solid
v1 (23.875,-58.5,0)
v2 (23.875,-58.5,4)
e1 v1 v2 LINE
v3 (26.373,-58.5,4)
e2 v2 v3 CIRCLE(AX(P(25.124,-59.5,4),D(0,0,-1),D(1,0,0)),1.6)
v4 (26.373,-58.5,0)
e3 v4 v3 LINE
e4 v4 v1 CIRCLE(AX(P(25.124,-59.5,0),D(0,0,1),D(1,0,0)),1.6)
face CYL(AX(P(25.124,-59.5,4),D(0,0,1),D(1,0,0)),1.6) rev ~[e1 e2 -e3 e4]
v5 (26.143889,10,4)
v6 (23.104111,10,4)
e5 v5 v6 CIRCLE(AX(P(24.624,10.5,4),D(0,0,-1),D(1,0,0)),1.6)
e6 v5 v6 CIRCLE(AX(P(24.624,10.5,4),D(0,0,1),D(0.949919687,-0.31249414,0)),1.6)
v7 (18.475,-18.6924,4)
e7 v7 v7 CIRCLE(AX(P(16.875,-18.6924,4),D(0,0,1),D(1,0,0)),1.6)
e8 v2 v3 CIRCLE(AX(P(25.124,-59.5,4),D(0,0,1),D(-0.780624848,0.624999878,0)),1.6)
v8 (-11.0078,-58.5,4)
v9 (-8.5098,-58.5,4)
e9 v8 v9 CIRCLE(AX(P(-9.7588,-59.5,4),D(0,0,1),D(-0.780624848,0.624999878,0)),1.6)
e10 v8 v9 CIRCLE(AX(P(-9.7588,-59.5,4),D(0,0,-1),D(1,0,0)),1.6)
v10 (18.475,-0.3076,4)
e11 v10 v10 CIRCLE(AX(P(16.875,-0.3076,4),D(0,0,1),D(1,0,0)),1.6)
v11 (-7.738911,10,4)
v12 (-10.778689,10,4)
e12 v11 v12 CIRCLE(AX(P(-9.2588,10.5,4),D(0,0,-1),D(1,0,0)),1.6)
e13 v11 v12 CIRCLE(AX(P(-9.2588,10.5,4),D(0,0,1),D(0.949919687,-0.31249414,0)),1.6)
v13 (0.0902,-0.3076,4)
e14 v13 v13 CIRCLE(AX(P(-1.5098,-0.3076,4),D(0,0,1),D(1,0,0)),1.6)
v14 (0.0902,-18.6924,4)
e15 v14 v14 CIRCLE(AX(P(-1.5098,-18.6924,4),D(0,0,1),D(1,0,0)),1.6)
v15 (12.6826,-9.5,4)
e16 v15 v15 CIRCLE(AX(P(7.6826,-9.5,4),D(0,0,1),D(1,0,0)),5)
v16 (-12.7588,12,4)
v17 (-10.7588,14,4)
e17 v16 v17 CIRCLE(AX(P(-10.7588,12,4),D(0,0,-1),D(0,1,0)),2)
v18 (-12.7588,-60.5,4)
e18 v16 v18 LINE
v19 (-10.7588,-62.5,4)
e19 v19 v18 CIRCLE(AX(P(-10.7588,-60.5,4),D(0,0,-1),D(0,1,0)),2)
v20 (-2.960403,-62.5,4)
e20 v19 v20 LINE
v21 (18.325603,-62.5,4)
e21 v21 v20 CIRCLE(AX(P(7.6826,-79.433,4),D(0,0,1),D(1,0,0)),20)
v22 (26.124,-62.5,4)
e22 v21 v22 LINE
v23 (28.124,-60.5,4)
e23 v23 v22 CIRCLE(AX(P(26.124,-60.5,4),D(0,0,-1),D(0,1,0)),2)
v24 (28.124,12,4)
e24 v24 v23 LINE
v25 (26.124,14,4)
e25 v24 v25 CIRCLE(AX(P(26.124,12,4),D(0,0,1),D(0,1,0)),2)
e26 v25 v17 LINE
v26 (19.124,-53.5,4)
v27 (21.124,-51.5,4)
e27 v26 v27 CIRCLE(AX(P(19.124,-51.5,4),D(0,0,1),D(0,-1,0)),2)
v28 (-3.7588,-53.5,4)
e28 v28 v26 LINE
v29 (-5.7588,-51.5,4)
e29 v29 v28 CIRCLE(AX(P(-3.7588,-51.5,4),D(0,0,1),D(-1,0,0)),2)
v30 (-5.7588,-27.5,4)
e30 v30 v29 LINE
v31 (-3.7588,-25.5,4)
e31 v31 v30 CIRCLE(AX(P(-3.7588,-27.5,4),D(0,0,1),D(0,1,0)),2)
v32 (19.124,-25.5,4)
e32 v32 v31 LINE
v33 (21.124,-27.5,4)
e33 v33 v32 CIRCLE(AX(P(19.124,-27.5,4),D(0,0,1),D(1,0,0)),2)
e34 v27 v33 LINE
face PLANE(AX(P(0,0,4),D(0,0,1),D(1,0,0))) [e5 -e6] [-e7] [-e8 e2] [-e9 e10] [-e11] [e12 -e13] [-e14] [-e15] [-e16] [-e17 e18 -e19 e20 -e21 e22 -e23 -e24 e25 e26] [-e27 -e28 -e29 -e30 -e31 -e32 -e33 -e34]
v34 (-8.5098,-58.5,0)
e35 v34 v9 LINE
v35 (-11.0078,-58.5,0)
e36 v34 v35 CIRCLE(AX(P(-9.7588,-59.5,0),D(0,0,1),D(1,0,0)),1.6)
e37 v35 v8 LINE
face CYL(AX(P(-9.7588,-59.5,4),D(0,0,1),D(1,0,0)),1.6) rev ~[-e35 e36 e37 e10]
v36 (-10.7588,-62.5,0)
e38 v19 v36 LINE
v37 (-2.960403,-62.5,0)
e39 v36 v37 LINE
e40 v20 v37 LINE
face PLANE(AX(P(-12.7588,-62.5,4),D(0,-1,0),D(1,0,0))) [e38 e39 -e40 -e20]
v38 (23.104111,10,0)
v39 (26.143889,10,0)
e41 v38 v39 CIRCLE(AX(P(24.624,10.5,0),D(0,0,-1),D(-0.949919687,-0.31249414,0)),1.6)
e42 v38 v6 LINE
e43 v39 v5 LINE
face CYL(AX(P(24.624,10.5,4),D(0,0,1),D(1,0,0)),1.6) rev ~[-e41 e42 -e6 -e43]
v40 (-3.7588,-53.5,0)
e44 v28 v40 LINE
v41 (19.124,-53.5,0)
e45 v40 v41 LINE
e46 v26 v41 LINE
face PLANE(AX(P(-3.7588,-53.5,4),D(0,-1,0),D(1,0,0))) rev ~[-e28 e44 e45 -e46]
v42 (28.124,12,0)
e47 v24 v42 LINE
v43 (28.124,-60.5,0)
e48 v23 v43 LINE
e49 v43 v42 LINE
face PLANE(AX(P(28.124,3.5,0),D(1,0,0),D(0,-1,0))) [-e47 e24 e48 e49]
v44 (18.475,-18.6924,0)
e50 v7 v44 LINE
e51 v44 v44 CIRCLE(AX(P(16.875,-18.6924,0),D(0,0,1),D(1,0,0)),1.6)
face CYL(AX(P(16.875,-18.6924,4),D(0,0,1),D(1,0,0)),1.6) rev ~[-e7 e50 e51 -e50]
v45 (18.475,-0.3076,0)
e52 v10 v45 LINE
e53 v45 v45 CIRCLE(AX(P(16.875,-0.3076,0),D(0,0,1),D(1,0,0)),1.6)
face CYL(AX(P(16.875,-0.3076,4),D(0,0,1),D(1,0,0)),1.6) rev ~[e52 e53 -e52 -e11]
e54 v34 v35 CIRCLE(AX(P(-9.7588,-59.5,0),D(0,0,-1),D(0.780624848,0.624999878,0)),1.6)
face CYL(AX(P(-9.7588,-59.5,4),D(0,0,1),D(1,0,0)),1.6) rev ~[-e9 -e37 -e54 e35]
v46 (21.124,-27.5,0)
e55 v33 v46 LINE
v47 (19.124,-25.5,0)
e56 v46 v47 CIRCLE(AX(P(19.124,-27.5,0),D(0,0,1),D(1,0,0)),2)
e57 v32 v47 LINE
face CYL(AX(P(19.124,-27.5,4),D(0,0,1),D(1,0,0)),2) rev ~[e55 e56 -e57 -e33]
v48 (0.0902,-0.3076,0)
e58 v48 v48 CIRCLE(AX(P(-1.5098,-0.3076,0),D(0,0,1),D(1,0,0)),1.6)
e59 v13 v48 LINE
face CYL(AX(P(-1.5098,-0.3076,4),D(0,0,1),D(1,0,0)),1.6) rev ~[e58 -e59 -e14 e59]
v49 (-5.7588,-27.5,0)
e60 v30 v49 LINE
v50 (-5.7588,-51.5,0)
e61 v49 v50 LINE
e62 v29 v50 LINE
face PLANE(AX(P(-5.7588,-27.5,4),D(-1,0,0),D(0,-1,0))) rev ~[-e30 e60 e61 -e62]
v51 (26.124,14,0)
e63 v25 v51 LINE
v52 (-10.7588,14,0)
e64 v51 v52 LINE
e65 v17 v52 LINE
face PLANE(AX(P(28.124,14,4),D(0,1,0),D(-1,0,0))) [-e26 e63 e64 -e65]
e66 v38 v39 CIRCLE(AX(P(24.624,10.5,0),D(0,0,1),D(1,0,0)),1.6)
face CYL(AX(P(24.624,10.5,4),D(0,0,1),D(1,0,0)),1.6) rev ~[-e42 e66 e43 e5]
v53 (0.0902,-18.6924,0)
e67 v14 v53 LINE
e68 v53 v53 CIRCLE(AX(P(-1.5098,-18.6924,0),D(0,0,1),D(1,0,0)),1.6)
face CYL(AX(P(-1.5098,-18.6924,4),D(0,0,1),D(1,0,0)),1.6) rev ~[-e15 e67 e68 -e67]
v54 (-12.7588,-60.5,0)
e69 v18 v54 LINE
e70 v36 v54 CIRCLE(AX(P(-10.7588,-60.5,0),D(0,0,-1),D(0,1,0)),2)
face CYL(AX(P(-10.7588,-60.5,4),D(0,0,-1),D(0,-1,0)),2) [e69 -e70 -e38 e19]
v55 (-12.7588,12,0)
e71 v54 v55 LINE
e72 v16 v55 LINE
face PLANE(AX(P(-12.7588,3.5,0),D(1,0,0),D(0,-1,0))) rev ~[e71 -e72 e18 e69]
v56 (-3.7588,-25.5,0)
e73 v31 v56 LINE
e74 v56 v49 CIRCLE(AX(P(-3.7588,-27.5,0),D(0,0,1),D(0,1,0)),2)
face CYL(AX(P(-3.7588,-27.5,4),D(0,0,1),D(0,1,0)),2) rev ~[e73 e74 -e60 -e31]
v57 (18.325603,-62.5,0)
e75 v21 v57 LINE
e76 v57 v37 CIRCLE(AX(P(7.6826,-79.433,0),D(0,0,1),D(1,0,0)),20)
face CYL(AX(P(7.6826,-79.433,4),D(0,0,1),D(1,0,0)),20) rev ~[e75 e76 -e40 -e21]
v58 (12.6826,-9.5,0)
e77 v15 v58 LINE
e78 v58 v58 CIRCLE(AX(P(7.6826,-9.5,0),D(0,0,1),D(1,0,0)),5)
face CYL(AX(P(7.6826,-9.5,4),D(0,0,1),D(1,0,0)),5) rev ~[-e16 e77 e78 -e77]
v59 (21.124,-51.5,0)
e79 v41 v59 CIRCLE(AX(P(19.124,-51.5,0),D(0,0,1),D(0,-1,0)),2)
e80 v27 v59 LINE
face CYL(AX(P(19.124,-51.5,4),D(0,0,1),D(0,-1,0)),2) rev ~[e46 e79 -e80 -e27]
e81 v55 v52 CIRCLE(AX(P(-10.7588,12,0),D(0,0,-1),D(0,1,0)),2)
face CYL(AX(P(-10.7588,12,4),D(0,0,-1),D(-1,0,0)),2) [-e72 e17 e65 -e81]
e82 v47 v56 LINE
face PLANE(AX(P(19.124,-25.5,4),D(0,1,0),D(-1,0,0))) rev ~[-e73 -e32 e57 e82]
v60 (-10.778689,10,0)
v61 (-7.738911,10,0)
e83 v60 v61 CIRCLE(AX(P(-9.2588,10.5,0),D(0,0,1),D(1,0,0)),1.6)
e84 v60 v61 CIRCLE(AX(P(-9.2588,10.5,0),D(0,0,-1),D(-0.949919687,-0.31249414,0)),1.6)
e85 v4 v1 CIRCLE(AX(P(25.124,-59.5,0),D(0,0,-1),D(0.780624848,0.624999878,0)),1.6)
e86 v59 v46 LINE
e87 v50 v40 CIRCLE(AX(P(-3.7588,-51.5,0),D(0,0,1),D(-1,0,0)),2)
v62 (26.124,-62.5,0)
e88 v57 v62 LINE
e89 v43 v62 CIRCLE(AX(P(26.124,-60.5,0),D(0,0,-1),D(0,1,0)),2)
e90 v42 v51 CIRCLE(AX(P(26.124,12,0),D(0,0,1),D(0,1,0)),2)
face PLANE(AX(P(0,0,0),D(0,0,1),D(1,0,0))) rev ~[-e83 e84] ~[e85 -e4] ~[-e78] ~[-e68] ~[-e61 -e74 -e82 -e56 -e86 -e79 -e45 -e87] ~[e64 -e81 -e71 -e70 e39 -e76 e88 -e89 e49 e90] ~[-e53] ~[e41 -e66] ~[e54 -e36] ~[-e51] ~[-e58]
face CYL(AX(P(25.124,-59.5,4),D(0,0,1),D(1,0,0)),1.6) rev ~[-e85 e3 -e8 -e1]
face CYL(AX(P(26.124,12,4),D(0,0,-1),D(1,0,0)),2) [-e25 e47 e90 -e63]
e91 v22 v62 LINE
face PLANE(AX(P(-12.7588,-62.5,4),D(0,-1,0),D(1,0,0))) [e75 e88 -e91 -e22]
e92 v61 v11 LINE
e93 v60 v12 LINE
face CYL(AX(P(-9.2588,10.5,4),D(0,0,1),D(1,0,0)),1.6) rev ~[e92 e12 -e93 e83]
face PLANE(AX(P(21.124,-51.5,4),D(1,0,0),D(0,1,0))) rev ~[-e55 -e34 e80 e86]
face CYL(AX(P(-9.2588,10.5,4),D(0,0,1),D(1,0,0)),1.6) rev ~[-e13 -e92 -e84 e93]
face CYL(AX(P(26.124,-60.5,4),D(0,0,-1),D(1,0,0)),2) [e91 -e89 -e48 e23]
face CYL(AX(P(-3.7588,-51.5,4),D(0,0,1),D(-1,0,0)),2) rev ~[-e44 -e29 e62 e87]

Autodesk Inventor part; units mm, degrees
ref_plane "YZ Plane" through (0, 0, 0) normal (1, 0, 0) x (0, 1, 0)
ref_plane "XZ Plane" through (0, 0, 0) normal (0, 1, 0) x (-1, 0, 0)
ref_plane "XY Plane" through (0, 0, 0) normal (0, 0, 1) x (1, 0, 0)
sketch "스케치1" plane through (0, 0, 0) normal (0, 0, 1) x (1, 0, 0)
  line L0 (28.124, 3.5) -> (28.124, -58.5)
  line L1 (-12.7588, 3.5) -> (-12.7588, -58.5)
  line L2 (-12.7588, -58.5) -> (28.124, -58.5)
  line L3 (-12.7588, 3.5) -> (-12.7588, 4.4)
  line L4 (28.124, 4.4) -> (28.124, 3.5)
  line L5 (-12.7588, 4.4) -> (-12.7588, 10)
  line L6 (-12.7588, 10) -> (28.124, 10)
  line L7 (28.124, 10) -> (28.124, 4.4)
  dimension "d16" = 68.5
  dimension "d50" = 40.8828
extrude "돌출2" add sketch "스케치1" along normal blind 4
sketch "스케치4" plane through (0, 0, 4) normal (0, 0, 1) x (1, 0, 0)
  circle A0 centre (7.6826, -9.5) radius 5
  point P0 (0, 0)
sketch "스케치6" plane through (0, 0, 4) normal (0, 0, 1) x (1, 0, 0)
  circle A0 centre (7.6826, -9.5) radius 13 construction
  line L0 (7.6826, -9.5) -> (-1.5098, -0.3076) construction
  line L1 (7.6826, -9.5) -> (20.6826, -9.5) construction
  line L2 (7.6826, -9.5) -> (-1.5098, -18.6924) construction
  line L3 (7.6826, -9.5) -> (20.6826, -9.5) construction
  circle A1 centre (-1.5098, -0.3076) radius 1.6
  circle A2 centre (-1.5098, -18.6924) radius 1.6
  circle A3 centre (7.6826, -9.5) radius 5 projected
  circle A4 centre (16.875, -0.3076) radius 1.6
  line L4 (7.6826, -9.5) -> (16.875, -18.6924) construction
  circle A5 centre (16.875, -18.6924) radius 1.6
  point P0 (0, 0)
  dimension "d51" = 26
  dimension "d52" = 135
  dimension "d53" = 135
  dimension "d54" = 3.2
  dimension "d55" = 3.2
  dimension "d56" = 3.2
  dimension "d57" = 3.2
extrude "돌출4" cut sketch "스케치6" against normal up to surface (4 mm away)
sketch "스케치5" plane through (0, 0, 4) normal (0, 0, 1) x (1, 0, 0)
  line L0 (-12.7588, 10) -> (-12.7588, -58.5) projected
  line L1 (-12.7588, -58.5) -> (28.124, -58.5) projected
  line L2 (28.124, -58.5) -> (28.124, 10) projected
  line L3 (28.124, 10) -> (-12.7588, 10) projected
  circle A0 centre (-9.7588, -59.5) radius 1.6
  circle A1 centre (25.124, -59.5) radius 1.6
  circle A2 centre (-9.2588, 10.5) radius 1.6
  circle A3 centre (24.624, 10.5) radius 1.6
  line L4 (28.124, 10) -> (28.124, 14)
  line L5 (28.124, -58.5) -> (28.124, 10) projected
  line L6 (28.124, -58.5) -> (28.124, -62.5)
  point P0 (0, 0)
  dimension "d36" = 3.2
  dimension "d37" = 3.2
  dimension "d38" = 3.2
  dimension "d39" = 3.2
  dimension "d40" = 3
  dimension "d42" = 3.5
  dimension "d44" = 3.5
  dimension "d46" = 3
  dimension "d64" = 4
  dimension "d65" = 3.5
  dimension "d66" = 3.5
  dimension "d67" = 4
  dimension "d68" = 3
  dimension "d69" = 3
extrude "돌출3" cut sketch "스케치5" against normal up to surface (4 mm away) contours A2 L3 | L3 A2 | A0 L1 | L1 A0 | A3 L3 | L3 A3 | A1 L1 | L1 A1
sketch "스케치7" plane through (0, 0, 4) normal (0, 0, 1) x (1, 0, 0)
  line L0 (-12.7588, 10) -> (-12.7588, 14)
  arc A0 (23.1041, 10) -> (26.1439, 10) centre (24.624, 10.5) ccw projected
  arc A1 (26.373, -58.5) -> (23.875, -58.5) centre (25.124, -59.5) ccw projected
  arc A2 (-10.7787, 10) -> (-7.7389, 10) centre (-9.2588, 10.5) ccw projected
  arc A3 (-8.5098, -58.5) -> (-11.0078, -58.5) centre (-9.7588, -59.5) ccw projected
  circle A4 centre (16.875, -0.3076) radius 1.6 projected
  circle A5 centre (-1.5098, -18.6924) radius 1.6 projected
  circle A6 centre (7.6826, -9.5) radius 5 projected
  circle A7 centre (16.875, -18.6924) radius 1.6 projected
  circle A8 centre (-1.5098, -0.3076) radius 1.6 projected
  line L1 (-12.7588, -58.5) -> (-11.0078, -58.5) projected
  line L2 (28.124, -58.5) -> (28.124, 10) projected
  line L3 (28.124, 10) -> (26.1439, 10) projected
  line L4 (-12.7588, 10) -> (-12.7588, -58.5) projected
  line L5 (28.124, 10) -> (28.124, 14)
  line L6 (28.124, 14) -> (-12.7588, 14)
  line L7 (28.124, -58.5) -> (28.124, 10) projected
  line L8 (-12.7588, -58.5) -> (28.124, -58.5) projected
  line L9 (28.124, -58.5) -> (-12.7588, -58.5)
  line L10 (-12.7588, -58.5) -> (-12.7588, -62.5)
  line L11 (-12.7588, -62.5) -> (28.124, -62.5)
  line L12 (28.124, -62.5) -> (28.124, -58.5)
  line L13 (23.1041, 10) -> (-7.7389, 10) projected
  line L14 (-10.7787, 10) -> (-12.7588, 10) projected
  line L15 (-8.5098, -58.5) -> (23.875, -58.5) projected
  line L16 (26.373, -58.5) -> (28.124, -58.5) projected
  circle A9 centre (24.624, 10.5) radius 1.6
  arc A10 (-10.7787, 10) -> (-7.7389, 10) centre (-9.2588, 10.5) ccw projected
  circle A11 centre (-9.2588, 10.5) radius 1.6
  circle A12 centre (25.124, -59.5) radius 1.6
  arc A13 (-8.5098, -58.5) -> (-11.0078, -58.5) centre (-9.7588, -59.5) ccw projected
  circle A14 centre (-9.7588, -59.5) radius 1.6
  point P0 (0, 0)
  point P1 (26.373, -58.5)
  point P2 (23.875, -58.5)
  point P3 (-7.7389, 10)
  dimension "d60" = 4
  dimension "d61" = 4
extrude "돌출6" add sketch "스케치7" against normal up to surface (4 mm away) contours L0 L6 L5 L3 A9 L13 A11 L14 | L1 A14 L8 A12 L12 L11 L10
fillet "모깎기3" radius 2 4 edges at (28.124, 14, 2) (-12.7588, 14, 2) (-12.7588, -62.5, 2) (28.124, -62.5, 2)
sketch "스케치10" plane through (0, 0, 4) normal (0, 0, 1) x (1, 0, 0)
  line L0 (-3.7588, -53.5) -> (19.124, -53.5)
  line L1 (21.124, -51.5) -> (21.124, -27.5)
  line L2 (19.124, -25.5) -> (-3.7588, -25.5)
  line L3 (-5.7588, -27.5) -> (-5.7588, -51.5)
  circle A0 centre (-9.7588, -59.5) radius 1.6 projected
  line L4 (28.124, -60.5) -> (28.124, 12) projected
  line L5 (-12.7588, 12) -> (-12.7588, -60.5) projected
  circle A1 centre (25.124, -59.5) radius 1.6 projected
  circle A2 centre (24.624, 10.5) radius 1.6 projected
  circle A3 centre (-9.2588, 10.5) radius 1.6 projected
  circle A4 centre (16.875, -0.3076) radius 1.6 projected
  circle A5 centre (-1.5098, -18.6924) radius 1.6 projected
  circle A6 centre (7.6826, -9.5) radius 5 projected
  circle A7 centre (16.875, -18.6924) radius 1.6 projected
  circle A8 centre (-1.5098, -0.3076) radius 1.6 projected
  arc A9 (-5.7588, -51.5) -> (-3.7588, -53.5) centre (-3.7588, -51.5) ccw
  arc A10 (19.124, -53.5) -> (21.124, -51.5) centre (19.124, -51.5) ccw
  arc A11 (21.124, -27.5) -> (19.124, -25.5) centre (19.124, -27.5) ccw
  arc A12 (-3.7588, -25.5) -> (-5.7588, -27.5) centre (-3.7588, -27.5) ccw
  arc A13 (26.124, -62.5) -> (28.124, -60.5) centre (26.124, -60.5) ccw projected
  arc A14 (28.124, 12) -> (26.124, 14) centre (26.124, 12) ccw projected
  line L6 (26.124, 14) -> (-10.7588, 14) projected
  arc A15 (-10.7588, 14) -> (-12.7588, 12) centre (-10.7588, 12) ccw projected
  arc A16 (-12.7588, -60.5) -> (-10.7588, -62.5) centre (-10.7588, -60.5) ccw projected
  line L7 (-10.7588, -62.5) -> (26.124, -62.5) projected
  point P0 (0, 0)
  point P1 (-5.7588, -53.5)
  point P2 (21.124, -25.5)
  point P3 (21.124, -53.5)
  point P4 (-5.7588, -25.5)
  dimension "d84" = 16
  dimension "d87" = 7
  dimension "d88" = 7
  dimension "d89" = 2
extrude "돌출7" cut sketch "스케치10" against normal up to surface (4 mm away) contours A9 L3 A12 L2 A11 L1 A10 L0
sketch "스케치11" plane through (0, 0, 4) normal (0, 0, 1) x (1, 0, 0)
  line L0 (-10.7588, 14) -> (26.124, 14) projected
  line L1 (7.6826, 14) -> (7.6826, -136) construction
  circle A0 centre (7.6826, -79.433) radius 20
  arc A1 (21.124, -27.5) -> (19.124, -25.5) centre (19.124, -27.5) ccw projected
  line L2 (21.124, -27.5) -> (21.124, -51.5) projected
  arc A2 (19.124, -53.5) -> (21.124, -51.5) centre (19.124, -51.5) ccw projected
  line L3 (19.124, -53.5) -> (-3.7588, -53.5) projected
  arc A3 (-5.7588, -51.5) -> (-3.7588, -53.5) centre (-3.7588, -51.5) ccw projected
  line L4 (-5.7588, -51.5) -> (-5.7588, -27.5) projected
  arc A4 (-3.7588, -25.5) -> (-5.7588, -27.5) centre (-3.7588, -27.5) ccw projected
  line L5 (-3.7588, -25.5) -> (19.124, -25.5) projected
  circle A5 centre (25.124, -59.5) radius 1.6 projected
  circle A6 centre (-9.7588, -59.5) radius 1.6 projected
  line L6 (28.124, -60.5) -> (28.124, 12) projected
  line L7 (-12.7588, 12) -> (-12.7588, -60.5) projected
  circle A7 centre (24.624, 10.5) radius 1.6 projected
  circle A8 centre (-9.2588, 10.5) radius 1.6 projected
  circle A9 centre (16.875, -0.3076) radius 1.6 projected
  circle A10 centre (-1.5098, -18.6924) radius 1.6 projected
  circle A11 centre (7.6826, -9.5) radius 5 projected
  circle A12 centre (16.875, -18.6924) radius 1.6 projected
  circle A13 centre (-1.5098, -0.3076) radius 1.6 projected
  arc A14 (26.124, -62.5) -> (28.124, -60.5) centre (26.124, -60.5) ccw projected
  arc A15 (28.124, 12) -> (26.124, 14) centre (26.124, 12) ccw projected
  line L8 (26.124, 14) -> (-10.7588, 14) projected
  arc A16 (-10.7588, 14) -> (-12.7588, 12) centre (-10.7588, 12) ccw projected
  arc A17 (-12.7588, -60.5) -> (-10.7588, -62.5) centre (-10.7588, -60.5) ccw projected
  line L9 (-10.7588, -62.5) -> (26.124, -62.5) projected
  point P0 (0, 0)
  point P1 (-2.9604, -62.5)
  point P2 (18.3256, -62.5)
  dimension "d90" = 150
  dimension "d91" = 40
  dimension "d92" = 25.933
extrude "돌출8" cut sketch "스케치11" against normal up to surface (4 mm away) contours A0 L9 picked at (6.936, -61.5196)
properties part number "링크2고정부" material "알루미늄 6061"
